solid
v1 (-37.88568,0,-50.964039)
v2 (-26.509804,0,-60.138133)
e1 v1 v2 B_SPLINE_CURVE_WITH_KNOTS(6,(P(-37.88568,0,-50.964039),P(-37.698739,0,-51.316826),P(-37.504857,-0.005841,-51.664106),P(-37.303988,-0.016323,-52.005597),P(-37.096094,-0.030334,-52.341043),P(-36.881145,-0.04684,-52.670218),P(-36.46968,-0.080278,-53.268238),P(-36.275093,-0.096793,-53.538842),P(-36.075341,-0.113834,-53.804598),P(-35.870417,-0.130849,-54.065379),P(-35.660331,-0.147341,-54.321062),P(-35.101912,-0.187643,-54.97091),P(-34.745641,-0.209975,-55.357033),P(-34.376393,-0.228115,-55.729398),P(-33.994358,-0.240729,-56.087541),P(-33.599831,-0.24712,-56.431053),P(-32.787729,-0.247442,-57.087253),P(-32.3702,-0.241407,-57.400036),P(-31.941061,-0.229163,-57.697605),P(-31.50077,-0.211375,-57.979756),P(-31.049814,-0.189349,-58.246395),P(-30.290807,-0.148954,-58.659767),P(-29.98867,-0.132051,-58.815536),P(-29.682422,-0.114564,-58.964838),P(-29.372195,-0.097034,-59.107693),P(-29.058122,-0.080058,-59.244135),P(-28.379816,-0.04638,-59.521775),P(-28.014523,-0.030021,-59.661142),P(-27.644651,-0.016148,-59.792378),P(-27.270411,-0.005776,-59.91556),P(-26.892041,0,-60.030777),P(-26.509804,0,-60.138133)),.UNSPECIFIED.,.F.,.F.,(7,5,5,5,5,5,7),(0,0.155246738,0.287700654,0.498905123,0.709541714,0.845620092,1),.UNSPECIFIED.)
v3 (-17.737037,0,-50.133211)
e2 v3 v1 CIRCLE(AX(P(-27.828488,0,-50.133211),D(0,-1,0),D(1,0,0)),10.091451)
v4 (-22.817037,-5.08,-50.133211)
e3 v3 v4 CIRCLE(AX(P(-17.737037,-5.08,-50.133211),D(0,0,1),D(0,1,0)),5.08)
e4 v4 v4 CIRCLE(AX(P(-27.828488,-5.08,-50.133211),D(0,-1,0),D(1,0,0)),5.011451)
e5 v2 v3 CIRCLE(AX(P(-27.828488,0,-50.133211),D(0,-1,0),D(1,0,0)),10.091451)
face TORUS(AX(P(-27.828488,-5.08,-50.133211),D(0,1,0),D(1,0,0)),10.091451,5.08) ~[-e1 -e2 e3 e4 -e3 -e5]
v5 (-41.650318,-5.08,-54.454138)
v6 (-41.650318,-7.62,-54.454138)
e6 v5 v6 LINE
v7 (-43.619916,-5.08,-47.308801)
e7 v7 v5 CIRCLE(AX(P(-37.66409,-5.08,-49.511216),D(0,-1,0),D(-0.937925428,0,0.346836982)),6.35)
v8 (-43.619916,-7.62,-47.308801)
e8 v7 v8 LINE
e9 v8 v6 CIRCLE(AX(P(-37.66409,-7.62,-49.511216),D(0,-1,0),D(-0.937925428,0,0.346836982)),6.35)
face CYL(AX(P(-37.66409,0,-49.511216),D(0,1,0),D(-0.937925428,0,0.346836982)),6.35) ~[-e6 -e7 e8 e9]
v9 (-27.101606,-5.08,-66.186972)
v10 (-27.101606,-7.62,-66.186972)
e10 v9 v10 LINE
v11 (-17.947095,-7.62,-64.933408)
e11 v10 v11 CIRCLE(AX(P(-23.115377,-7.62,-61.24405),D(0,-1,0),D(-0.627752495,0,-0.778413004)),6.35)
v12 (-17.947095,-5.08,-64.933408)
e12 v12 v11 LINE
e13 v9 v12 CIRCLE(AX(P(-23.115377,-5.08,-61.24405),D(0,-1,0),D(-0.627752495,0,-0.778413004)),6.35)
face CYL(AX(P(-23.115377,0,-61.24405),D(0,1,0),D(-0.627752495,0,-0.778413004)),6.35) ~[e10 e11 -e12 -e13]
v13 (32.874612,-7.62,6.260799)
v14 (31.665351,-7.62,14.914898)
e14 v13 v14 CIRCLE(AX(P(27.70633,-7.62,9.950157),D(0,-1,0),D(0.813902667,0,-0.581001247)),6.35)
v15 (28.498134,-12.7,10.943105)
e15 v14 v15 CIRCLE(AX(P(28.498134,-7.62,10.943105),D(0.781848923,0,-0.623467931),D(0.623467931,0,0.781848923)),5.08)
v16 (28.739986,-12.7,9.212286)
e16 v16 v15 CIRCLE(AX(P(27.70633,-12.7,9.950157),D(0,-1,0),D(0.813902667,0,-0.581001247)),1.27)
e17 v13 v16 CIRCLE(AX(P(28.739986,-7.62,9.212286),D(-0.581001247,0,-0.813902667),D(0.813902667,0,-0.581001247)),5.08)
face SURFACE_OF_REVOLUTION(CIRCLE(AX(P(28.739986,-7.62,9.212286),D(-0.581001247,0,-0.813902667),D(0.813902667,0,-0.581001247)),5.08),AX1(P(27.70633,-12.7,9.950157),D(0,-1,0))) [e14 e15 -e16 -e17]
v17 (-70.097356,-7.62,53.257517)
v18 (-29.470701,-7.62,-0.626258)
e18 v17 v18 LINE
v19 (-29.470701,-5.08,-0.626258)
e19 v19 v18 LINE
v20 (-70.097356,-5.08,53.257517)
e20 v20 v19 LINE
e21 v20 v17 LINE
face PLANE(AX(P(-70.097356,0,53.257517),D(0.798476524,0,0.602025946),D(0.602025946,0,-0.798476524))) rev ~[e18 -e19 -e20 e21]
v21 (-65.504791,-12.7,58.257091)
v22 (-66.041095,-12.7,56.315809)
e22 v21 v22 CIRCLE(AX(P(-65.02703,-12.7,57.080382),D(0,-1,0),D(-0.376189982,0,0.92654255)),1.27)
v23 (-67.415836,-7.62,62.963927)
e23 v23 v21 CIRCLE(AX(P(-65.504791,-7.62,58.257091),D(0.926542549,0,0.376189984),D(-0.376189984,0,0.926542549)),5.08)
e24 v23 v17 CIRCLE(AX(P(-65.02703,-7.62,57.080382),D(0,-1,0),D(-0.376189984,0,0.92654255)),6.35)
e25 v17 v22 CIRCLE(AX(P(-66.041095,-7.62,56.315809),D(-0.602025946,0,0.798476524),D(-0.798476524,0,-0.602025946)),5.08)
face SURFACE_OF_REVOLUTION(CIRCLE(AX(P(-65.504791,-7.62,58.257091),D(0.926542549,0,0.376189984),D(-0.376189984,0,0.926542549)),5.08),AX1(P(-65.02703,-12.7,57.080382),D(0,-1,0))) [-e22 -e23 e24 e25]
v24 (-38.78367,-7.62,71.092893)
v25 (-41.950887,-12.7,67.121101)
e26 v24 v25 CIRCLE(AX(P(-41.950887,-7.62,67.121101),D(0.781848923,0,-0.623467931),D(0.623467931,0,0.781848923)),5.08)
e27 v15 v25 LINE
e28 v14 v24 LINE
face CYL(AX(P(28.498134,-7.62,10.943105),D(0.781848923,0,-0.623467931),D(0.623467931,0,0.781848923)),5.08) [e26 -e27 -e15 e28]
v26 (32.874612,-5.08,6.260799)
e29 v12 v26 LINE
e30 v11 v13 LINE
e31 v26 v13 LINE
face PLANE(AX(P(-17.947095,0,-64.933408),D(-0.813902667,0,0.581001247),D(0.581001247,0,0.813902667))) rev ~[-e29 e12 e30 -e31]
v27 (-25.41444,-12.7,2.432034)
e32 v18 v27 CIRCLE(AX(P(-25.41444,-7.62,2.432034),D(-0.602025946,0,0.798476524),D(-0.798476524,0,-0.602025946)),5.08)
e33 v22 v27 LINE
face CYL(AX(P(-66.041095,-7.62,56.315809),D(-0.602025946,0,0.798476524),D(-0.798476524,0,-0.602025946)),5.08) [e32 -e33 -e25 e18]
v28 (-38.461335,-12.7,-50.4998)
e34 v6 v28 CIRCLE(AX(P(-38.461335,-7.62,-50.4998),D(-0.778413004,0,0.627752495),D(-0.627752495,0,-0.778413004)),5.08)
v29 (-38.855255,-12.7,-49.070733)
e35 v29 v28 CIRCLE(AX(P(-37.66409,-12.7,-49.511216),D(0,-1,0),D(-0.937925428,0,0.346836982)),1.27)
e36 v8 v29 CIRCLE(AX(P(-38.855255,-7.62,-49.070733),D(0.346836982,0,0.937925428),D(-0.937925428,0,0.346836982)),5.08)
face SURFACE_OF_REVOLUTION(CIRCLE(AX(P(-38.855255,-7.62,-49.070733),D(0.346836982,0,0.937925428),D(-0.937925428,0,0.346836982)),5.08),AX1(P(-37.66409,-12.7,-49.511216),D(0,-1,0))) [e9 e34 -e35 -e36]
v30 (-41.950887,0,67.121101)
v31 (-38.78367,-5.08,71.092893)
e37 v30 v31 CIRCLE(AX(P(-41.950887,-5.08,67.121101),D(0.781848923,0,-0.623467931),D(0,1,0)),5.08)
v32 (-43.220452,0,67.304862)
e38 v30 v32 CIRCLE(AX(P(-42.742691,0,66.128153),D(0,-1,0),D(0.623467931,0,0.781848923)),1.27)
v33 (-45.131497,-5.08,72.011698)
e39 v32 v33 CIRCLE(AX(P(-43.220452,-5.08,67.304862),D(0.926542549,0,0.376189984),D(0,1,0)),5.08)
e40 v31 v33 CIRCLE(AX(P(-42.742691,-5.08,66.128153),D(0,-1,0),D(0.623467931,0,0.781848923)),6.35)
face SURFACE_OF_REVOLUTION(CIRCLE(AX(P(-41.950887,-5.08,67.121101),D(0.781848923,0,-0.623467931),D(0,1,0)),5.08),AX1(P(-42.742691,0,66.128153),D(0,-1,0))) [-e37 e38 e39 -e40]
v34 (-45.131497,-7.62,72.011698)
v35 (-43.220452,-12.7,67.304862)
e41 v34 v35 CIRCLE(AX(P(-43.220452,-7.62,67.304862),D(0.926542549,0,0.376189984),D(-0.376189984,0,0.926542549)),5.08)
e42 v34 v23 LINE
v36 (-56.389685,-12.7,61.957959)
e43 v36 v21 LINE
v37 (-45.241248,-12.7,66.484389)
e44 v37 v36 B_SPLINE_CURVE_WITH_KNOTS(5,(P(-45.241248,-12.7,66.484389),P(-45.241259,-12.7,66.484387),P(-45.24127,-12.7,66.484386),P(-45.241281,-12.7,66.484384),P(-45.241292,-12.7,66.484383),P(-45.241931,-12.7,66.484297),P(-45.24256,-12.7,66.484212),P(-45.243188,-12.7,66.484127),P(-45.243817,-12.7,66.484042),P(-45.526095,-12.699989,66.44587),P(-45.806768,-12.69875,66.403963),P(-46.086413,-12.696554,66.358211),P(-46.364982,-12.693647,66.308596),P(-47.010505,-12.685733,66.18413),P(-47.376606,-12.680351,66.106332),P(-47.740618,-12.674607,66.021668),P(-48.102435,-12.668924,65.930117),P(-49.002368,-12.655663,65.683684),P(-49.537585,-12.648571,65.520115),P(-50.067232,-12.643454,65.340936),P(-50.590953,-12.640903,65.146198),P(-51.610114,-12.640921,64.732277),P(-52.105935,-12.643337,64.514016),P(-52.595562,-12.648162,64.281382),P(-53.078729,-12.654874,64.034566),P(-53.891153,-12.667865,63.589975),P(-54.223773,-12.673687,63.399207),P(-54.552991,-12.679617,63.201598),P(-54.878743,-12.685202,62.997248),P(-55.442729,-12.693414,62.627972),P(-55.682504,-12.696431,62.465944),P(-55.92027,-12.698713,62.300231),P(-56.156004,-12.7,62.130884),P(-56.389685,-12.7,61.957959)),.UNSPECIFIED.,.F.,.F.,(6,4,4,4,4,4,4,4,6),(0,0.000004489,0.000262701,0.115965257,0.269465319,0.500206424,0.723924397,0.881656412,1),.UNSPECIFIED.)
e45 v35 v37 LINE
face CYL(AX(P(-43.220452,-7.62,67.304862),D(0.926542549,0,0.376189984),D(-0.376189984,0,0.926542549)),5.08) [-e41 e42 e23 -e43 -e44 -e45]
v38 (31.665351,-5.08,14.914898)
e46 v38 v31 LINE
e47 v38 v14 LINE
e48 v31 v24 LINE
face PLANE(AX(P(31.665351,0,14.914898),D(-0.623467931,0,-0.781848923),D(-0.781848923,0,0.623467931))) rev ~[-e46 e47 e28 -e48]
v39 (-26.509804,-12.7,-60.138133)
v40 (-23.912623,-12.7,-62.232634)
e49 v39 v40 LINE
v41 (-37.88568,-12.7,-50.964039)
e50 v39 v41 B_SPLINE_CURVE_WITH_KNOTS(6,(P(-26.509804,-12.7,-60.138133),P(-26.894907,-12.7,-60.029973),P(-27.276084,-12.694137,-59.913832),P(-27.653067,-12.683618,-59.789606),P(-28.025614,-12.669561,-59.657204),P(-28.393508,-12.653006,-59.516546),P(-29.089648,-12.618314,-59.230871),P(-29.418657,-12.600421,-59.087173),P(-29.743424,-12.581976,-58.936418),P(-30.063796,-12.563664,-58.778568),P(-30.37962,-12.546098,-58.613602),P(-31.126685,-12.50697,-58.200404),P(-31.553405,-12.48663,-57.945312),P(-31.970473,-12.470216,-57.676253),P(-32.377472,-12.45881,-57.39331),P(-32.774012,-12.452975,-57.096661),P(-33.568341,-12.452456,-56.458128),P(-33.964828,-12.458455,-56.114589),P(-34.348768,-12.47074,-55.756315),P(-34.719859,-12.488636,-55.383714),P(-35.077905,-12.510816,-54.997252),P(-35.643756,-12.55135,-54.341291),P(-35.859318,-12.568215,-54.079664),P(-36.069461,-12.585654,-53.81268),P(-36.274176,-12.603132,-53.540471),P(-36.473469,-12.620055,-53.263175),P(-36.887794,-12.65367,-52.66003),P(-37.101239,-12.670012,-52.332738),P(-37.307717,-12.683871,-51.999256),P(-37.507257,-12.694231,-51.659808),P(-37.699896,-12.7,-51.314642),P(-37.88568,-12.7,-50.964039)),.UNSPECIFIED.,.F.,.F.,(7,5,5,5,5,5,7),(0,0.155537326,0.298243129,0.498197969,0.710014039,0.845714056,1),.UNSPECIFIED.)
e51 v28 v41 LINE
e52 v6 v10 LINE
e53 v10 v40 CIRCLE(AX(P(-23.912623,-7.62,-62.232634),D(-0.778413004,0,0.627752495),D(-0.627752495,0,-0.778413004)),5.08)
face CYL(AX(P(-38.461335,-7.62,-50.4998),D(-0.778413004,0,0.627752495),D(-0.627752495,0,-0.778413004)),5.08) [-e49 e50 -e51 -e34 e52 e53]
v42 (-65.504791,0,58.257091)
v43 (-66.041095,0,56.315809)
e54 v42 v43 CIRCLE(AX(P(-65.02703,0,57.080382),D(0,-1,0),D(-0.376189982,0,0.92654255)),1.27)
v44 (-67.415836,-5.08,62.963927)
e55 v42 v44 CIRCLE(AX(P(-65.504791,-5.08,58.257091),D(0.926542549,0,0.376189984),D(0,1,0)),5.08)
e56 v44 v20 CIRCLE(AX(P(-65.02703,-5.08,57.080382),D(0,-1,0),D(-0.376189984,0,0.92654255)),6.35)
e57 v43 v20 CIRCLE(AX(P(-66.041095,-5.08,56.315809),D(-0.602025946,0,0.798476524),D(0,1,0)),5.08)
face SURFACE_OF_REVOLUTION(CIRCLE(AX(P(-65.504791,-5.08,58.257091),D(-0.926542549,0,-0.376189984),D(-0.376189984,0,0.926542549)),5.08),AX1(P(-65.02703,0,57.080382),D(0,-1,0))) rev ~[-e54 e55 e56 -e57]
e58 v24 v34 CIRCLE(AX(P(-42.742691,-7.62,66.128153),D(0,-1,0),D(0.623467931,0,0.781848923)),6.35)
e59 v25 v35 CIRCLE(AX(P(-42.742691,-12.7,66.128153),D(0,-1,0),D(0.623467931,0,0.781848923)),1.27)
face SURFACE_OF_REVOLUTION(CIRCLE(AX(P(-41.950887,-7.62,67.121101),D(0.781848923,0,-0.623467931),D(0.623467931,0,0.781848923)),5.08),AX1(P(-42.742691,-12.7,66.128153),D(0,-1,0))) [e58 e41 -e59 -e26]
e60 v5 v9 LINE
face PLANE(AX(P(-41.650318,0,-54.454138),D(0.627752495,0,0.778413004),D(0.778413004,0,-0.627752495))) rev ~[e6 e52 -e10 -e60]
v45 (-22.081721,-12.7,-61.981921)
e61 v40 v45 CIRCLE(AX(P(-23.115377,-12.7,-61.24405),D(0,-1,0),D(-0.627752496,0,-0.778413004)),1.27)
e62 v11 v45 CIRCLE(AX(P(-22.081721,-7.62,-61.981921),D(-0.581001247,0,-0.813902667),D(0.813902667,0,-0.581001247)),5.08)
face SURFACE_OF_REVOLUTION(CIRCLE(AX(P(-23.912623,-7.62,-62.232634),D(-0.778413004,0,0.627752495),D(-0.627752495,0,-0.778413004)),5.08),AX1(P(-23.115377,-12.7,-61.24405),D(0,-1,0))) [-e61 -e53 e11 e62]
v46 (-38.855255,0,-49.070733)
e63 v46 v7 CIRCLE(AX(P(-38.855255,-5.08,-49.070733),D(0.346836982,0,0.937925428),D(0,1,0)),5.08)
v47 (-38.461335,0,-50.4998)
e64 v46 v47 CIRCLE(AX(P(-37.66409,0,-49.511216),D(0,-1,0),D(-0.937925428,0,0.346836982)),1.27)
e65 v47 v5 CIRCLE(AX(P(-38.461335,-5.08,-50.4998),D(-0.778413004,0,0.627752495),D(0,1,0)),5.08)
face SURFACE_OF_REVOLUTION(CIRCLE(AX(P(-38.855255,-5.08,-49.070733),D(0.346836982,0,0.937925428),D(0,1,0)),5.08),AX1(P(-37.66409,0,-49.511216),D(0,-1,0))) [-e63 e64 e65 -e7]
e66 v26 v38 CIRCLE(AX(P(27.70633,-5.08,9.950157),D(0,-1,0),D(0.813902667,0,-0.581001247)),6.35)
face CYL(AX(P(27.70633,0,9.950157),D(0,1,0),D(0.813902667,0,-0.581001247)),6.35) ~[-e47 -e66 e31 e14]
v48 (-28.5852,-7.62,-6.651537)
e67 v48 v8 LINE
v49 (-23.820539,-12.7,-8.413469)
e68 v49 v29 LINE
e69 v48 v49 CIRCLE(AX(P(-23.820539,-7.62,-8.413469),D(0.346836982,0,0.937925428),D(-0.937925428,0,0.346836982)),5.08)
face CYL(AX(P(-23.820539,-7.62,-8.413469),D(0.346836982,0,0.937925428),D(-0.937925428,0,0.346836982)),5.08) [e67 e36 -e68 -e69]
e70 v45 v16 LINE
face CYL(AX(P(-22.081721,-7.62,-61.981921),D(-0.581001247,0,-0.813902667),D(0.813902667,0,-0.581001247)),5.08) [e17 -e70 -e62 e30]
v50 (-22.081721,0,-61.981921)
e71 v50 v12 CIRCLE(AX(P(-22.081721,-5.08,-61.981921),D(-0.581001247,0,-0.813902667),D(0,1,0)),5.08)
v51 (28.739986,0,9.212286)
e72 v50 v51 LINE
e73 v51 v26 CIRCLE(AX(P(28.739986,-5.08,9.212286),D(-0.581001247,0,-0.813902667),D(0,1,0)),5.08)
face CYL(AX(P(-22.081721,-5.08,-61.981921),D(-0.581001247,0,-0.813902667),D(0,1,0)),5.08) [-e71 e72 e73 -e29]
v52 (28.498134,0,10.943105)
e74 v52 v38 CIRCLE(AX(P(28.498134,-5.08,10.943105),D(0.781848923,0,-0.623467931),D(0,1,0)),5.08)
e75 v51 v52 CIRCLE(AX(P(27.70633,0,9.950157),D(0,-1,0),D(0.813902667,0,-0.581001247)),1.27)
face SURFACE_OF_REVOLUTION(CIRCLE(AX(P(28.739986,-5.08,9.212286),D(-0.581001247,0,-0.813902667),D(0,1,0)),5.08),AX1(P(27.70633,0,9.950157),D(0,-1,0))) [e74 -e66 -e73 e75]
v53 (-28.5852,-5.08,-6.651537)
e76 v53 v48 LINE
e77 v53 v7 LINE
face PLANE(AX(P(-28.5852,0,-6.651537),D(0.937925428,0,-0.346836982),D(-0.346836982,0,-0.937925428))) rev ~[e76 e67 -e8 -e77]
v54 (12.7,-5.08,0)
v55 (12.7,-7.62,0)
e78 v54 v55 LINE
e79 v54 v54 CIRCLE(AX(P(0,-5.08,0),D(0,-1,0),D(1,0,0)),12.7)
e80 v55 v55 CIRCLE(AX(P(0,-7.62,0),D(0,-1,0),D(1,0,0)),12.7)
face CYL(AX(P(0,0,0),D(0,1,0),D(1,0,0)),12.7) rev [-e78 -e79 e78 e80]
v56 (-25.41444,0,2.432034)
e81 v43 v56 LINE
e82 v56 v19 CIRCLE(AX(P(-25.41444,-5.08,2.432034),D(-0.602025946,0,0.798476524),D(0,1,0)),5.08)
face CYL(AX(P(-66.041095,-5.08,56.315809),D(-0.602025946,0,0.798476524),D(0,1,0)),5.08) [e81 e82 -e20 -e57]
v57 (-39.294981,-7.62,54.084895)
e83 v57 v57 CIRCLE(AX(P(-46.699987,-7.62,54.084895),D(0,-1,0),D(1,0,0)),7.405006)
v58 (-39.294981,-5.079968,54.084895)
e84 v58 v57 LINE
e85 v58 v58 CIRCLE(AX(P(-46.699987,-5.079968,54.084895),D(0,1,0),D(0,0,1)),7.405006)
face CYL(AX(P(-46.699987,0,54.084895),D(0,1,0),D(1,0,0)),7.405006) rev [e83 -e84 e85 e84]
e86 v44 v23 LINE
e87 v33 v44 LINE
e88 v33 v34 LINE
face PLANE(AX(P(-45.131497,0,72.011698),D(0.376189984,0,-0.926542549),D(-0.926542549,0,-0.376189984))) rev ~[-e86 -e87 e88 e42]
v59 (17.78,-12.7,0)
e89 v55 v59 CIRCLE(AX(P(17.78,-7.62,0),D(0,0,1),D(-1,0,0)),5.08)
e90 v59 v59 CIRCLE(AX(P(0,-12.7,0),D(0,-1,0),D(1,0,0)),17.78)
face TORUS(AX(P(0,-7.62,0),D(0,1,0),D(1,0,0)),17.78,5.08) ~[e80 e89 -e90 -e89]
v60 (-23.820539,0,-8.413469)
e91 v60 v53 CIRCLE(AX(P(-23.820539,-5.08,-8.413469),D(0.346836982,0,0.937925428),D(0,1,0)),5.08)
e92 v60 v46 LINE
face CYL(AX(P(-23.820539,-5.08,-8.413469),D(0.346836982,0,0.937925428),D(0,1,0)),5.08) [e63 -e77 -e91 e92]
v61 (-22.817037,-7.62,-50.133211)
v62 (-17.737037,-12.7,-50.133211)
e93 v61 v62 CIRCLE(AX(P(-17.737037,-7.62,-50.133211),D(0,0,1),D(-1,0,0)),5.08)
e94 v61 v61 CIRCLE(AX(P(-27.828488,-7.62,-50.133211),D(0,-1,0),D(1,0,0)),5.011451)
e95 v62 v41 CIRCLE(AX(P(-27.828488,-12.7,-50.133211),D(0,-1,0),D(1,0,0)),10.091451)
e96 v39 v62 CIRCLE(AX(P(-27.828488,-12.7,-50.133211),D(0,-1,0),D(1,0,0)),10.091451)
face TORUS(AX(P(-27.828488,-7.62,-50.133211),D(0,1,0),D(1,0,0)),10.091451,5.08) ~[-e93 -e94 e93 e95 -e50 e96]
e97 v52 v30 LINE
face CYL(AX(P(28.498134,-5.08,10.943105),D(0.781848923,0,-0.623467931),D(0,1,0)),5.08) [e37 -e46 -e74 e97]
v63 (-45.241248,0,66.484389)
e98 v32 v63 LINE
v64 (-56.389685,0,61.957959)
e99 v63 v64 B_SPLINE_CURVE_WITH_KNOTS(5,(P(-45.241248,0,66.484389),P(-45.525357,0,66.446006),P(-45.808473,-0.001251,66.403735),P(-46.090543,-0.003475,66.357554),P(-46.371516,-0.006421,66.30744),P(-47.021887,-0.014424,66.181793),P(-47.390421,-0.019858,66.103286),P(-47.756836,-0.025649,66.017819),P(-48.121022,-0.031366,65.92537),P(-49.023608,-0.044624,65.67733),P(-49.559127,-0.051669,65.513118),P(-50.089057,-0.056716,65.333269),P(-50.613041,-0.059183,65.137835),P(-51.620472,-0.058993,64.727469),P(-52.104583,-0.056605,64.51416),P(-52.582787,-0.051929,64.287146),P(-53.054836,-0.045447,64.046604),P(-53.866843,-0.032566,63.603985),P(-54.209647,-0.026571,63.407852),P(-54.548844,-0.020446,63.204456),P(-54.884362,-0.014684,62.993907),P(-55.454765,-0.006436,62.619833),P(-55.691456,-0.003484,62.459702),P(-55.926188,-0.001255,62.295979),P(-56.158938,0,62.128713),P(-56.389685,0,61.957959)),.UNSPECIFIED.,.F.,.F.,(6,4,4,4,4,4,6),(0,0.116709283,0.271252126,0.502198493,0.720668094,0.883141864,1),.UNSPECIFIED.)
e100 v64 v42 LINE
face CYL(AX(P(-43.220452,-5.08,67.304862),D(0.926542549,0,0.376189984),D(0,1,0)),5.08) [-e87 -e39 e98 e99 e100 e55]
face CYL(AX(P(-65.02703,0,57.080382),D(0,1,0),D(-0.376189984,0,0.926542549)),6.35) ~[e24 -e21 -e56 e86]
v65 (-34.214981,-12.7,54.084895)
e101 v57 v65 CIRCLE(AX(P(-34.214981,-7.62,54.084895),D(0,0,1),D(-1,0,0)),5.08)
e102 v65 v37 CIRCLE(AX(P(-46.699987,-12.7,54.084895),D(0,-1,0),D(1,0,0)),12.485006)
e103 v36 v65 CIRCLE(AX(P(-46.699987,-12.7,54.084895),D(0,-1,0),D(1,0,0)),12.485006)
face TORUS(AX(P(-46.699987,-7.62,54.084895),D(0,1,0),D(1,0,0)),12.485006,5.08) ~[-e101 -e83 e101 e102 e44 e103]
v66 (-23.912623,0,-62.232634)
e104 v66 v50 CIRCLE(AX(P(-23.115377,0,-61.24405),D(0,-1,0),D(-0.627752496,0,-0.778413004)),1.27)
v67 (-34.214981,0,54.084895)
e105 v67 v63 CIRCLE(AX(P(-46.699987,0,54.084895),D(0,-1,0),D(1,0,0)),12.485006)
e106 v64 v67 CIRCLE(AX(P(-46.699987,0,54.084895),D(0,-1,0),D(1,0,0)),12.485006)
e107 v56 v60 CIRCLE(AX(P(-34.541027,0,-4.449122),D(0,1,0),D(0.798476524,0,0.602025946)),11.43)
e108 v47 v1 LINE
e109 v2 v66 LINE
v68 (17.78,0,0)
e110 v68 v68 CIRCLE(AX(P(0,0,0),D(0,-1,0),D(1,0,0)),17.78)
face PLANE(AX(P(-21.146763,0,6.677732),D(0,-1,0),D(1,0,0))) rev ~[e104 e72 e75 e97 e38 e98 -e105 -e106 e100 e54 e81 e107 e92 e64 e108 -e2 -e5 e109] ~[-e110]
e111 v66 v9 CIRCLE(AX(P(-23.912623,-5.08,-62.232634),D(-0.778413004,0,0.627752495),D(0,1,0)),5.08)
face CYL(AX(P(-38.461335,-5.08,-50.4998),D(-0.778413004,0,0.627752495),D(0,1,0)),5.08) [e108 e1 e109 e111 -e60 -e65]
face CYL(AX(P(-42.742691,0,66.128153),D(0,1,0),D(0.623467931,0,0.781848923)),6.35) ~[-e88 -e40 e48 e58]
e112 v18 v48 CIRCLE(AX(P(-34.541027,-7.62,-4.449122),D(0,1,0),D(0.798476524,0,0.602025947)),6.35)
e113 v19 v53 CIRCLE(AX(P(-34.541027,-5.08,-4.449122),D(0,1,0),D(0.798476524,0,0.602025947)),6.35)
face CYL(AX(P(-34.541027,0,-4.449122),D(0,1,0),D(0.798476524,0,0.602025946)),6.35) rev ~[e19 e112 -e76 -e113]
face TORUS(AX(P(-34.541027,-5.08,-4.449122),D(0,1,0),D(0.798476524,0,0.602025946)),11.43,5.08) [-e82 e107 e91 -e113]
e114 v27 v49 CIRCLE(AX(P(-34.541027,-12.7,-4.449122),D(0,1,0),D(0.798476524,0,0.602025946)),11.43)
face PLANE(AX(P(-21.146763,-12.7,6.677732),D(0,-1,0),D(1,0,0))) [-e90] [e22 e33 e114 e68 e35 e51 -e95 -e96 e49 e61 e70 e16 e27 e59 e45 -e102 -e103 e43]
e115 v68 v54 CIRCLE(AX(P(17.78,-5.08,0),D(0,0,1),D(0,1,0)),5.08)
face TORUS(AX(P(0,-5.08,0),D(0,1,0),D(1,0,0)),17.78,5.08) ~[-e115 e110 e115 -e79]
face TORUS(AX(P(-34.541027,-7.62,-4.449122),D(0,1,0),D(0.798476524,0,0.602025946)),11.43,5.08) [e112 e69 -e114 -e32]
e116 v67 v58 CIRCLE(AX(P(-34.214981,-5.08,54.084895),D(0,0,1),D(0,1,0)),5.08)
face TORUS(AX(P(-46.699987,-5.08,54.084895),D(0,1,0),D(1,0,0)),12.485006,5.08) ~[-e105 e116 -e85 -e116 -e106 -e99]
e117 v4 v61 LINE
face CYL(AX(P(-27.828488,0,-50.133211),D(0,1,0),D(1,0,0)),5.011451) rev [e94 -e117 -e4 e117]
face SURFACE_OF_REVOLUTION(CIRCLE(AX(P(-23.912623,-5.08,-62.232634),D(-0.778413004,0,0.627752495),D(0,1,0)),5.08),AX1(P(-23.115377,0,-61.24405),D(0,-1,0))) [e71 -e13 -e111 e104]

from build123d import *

# Parameters (mm, degrees)
F0_R         = 5.0114511668
F0_R_2       = 12.7
F0_R_3       = 7.4050061566
F1_DEPTH     = 12.7
F2_T1_DEPTH  = 67.4832294606
F2_T3_DEPTH  = 43.3480770651
F2_T5_DEPTH  = 18.6902227842
F2_T7_DEPTH  = 87.4726302362
F2_T9_DEPTH  = 90.1056698852
F2_T11_DEPTH = 24.0510688963
F2_T14_ANGLE = 104.9172533531
F2_T16_ANGLE = 57.3091059371
F2_T18_ANGLE = 71.4094727033
F2_T20_ANGLE = 93.3635037829
F2_T22_ANGLE = 86.9511700386
F2_T24_ANGLE = 60.6677060592
F3_T1_DEPTH  = 67.4832294606
F3_T3_DEPTH  = 43.3480770651
F3_T5_DEPTH  = 18.6902227842
F3_T7_DEPTH  = 87.4726302362
F3_T9_DEPTH  = 90.1056698852
F3_T11_DEPTH = 24.0510688963
F3_T14_ANGLE = 104.9172533531
F3_T16_ANGLE = 57.3091059371
F3_T18_ANGLE = 71.4094727033
F3_T20_ANGLE = 93.3635037829
F3_T22_ANGLE = 86.9511700386
F3_T24_ANGLE = 60.6677060592


# Not quite as in the source:
# - a fillet or chamfer that OpenCascade refuses, or shapes differently, is made with other operations: its cross-section is extruded or revolved along the edge and cut away or added


with BuildPart() as f1:
    # F0 (on Front) → F1 (new body)
    with BuildSketch(Plane.XZ):
        with BuildLine():
            Line((-70.0973556896, 53.2575167822), (-29.4707006051, -0.6262577244))
            ThreePointArc((-29.4707006051, -0.6262577244), (-28.258510501, -3.5258173929), (-28.5852000675, -6.6515373175))
            Line((-28.5852000675, -6.6515373175), (-43.6199162753, -47.3088010447))
            ThreePointArc((-43.6199162753, -47.3088010447), (-43.7857787204, -51.1986473183), (-41.6503181511, -54.4541384548))
            Line((-41.6503181511, -54.4541384548), (-27.101605684, -66.1869724377))
            ThreePointArc((-27.101605684, -66.1869724377), (-22.2538851697, -67.5353399701), (-17.947095407, -64.9334077788))
            Line((-17.947095407, -64.9334077788), (32.8746118318, 6.2607992451))
            ThreePointArc((32.8746118318, 6.2607992451), (33.9952305909, 10.8289222441), (31.6653512614, 14.9148978249))
            Line((31.6653512614, 14.9148978249), (-38.7836697055, 71.0928934304))
            ThreePointArc((-38.7836697055, 71.0928934304), (-41.8330514714, 72.4126619619), (-45.1314974688, 72.0116979572))
            Line((-45.1314974688, 72.0116979572), (-67.4158361597, 62.9639267308))
            ThreePointArc((-67.4158361597, 62.9639267308), (-71.1477537613, 58.7713096023), (-70.0973556896, 53.2575167822))
        make_face()
        with Locations((-27.8284879681, -50.1332112049)):
            Circle(F0_R, mode=Mode.SUBTRACT)
        Circle(F0_R_2, mode=Mode.SUBTRACT)
        with Locations((-46.6999868111, 54.0848947769)):
            Circle(F0_R_3, mode=Mode.SUBTRACT)
    extrude(amount=F1_DEPTH)

    # F2: fillet of radius 5.08 on 15 edges, made by hand

    # F2_s2 → F2_t1 (cut)
    with BuildSketch(Plane(origin=(-51.0068312032, 0, 67.6511660912), x_dir=(0, 1, 0), z_dir=(0.6020259464, 0, -0.7984765243))):
        with BuildLine():
            ThreePointArc((-7.62, -23.9086859864), (-11.2121024484, -22.4207884348), (-12.7, -18.8286859864))
            Line((-12.7, -18.8286859864), (-12.7, -23.9086859864))
            Line((-12.7, -23.9086859864), (-7.62, -23.9086859864))
        make_face()
    extrude(amount=F2_T1_DEPTH, mode=Mode.SUBTRACT)

    # F2_s4 → F2_t3 (cut)
    with BuildSketch(Plane(origin=(-5.6024752773, 0, -15.1503567959), x_dir=(0, 1, 0), z_dir=(-0.3468369816, 0, -0.9379254278))):
        with BuildLine():
            ThreePointArc((-7.62, -24.5037868769), (-11.2121024484, -23.0158893253), (-12.7, -19.4237868769))
            Line((-12.7, -19.4237868769), (-12.7, -24.5037868769))
            Line((-12.7, -24.5037868769), (-7.62, -24.5037868769))
        make_face()
    extrude(amount=F2_T3_DEPTH, mode=Mode.SUBTRACT)

    # F2_s6 → F2_t5 (cut)
    with BuildSketch(Plane(origin=(1.3720089605, 0, -1.1064589662), x_dir=(0, 1, 0), z_dir=(0.7784130042, 0, -0.6277524949))):
        with BuildLine():
            ThreePointArc((-7.62, -68.5339006399), (-11.2121024484, -67.0460030883), (-12.7, -63.4539006399))
            Line((-12.7, -63.4539006399), (-12.7, -68.5339006399))
            Line((-12.7, -68.5339006399), (-7.62, -68.5339006399))
        make_face()
    extrude(amount=F2_T5_DEPTH, mode=Mode.SUBTRACT)

    # F2_s8 → F2_t7 (cut)
    with BuildSketch(Plane(origin=(-36.7638756291, 0, -51.5011225467), x_dir=(0, 1, 0), z_dir=(0.5810012469, 0, 0.8139026668))):
        with BuildLine():
            ThreePointArc((-7.62, -23.1192020728), (-11.2121024484, -21.6313045212), (-12.7, -18.0392020728))
            Line((-12.7, -18.0392020728), (-12.7, -23.1192020728))
            Line((-12.7, -23.1192020728), (-7.62, -23.1192020728))
        make_face()
    extrude(amount=F2_T7_DEPTH, mode=Mode.SUBTRACT)

    # F2_s10 → F2_t9 (cut)
    with BuildSketch(Plane(origin=(12.0862587165, 0, -9.6379166061), x_dir=(0, 1, 0), z_dir=(-0.7818489231, 0, 0.6234679313))):
        with BuildLine():
            ThreePointArc((-7.62, -31.4035278491), (-11.2121024484, -29.9156302975), (-12.7, -26.3235278491))
            Line((-12.7, -26.3235278491), (-12.7, -31.4035278491))
            Line((-12.7, -31.4035278491), (-7.62, -31.4035278491))
        make_face()
    extrude(amount=F2_T9_DEPTH, mode=Mode.SUBTRACT)

    # F2_s12 → F2_t11 (cut)
    with BuildSketch(Plane(origin=(-13.6444260696, 0, -5.5398388665), x_dir=(0, 1, 0), z_dir=(-0.9265425494, 0, -0.3761899841))):
        with BuildLine():
            ThreePointArc((-7.62, -83.6999195282), (-11.2121024484, -82.2120219766), (-12.7, -78.6199195282))
            Line((-12.7, -78.6199195282), (-12.7, -83.6999195282))
            Line((-12.7, -83.6999195282), (-7.62, -83.6999195282))
        make_face()
    extrude(amount=F2_T11_DEPTH, mode=Mode.SUBTRACT)

    # F2_s13 → F2_t14 (revolve, cut)
    with BuildSketch(Plane(origin=(-35.9287647604, 0, -14.587610093), x_dir=(0, 1, 0), z_dir=(0.9265425494, 0, 0.3761899841))):
        with BuildLine():
            ThreePointArc((-7.62, 83.6999195282), (-11.2121024484, 82.2120219766), (-12.7, 78.6199195282))
            Line((-12.7, 78.6199195282), (-12.7, 83.6999195282))
            Line((-12.7, 83.6999195282), (-7.62, 83.6999195282))
        make_face()
    revolve(axis=Axis((-65.0270297604, -12.7, 57.0803815421), (0, -1, 0)), revolution_arc=F2_T14_ANGLE, mode=Mode.SUBTRACT)

    # F2_s15 → F2_t16 (revolve, cut)
    with BuildSketch(Plane(origin=(-10.3801761187, 0, 13.7673915846), x_dir=(0, 1, 0), z_dir=(-0.6020259464, 0, 0.7984765243))):
        with BuildLine():
            ThreePointArc((-7.62, 23.9086859864), (-11.2121024484, 22.4207884348), (-12.7, 18.8286859864))
            Line((-12.7, 18.8286859864), (-12.7, 23.9086859864))
            Line((-12.7, 23.9086859864), (-7.62, 23.9086859864))
        make_face()
    revolve(axis=Axis((-34.5410265343, -12.7, -4.4491224843), (0, 1, 0)), revolution_arc=F2_T16_ANGLE, mode=Mode.SUBTRACT)

    # F2_s17 → F2_t18 (revolve, cut)
    with BuildSketch(Plane(origin=(-20.6371914851, 0, -55.8076205231), x_dir=(0, 1, 0), z_dir=(0.3468369816, 0, 0.9379254278))):
        with BuildLine():
            ThreePointArc((-7.62, 24.5037868769), (-11.2121024484, 23.0158893253), (-12.7, 19.4237868769))
            Line((-12.7, 19.4237868769), (-12.7, 24.5037868769))
            Line((-12.7, 24.5037868769), (-7.62, 24.5037868769))
        make_face()
    revolve(axis=Axis((-37.6640898085, -12.7, -49.5112158779), (0, -1, 0)), revolution_arc=F2_T18_ANGLE, mode=Mode.SUBTRACT)

    # F2_s19 → F2_t20 (revolve, cut)
    with BuildSketch(Plane(origin=(15.9207214276, 0, -12.8392929492), x_dir=(0, 1, 0), z_dir=(-0.7784130042, 0, 0.6277524949))):
        with BuildLine():
            ThreePointArc((-7.62, 68.5339006399), (-11.2121024484, 67.0460030883), (-12.7, 63.4539006399))
            Line((-12.7, 63.4539006399), (-12.7, 68.5339006399))
            Line((-12.7, 68.5339006399), (-7.62, 68.5339006399))
        make_face()
    revolve(axis=Axis((-23.1153773414, -12.7, -61.2440498609), (0, -1, 0)), revolution_arc=F2_T20_ANGLE, mode=Mode.SUBTRACT)

    # F2_s21 → F2_t22 (revolve, cut)
    with BuildSketch(Plane(origin=(14.0578316098, 0, 19.6930844773), x_dir=(0, 1, 0), z_dir=(-0.5810012469, 0, -0.8139026668))):
        with BuildLine():
            ThreePointArc((-7.62, 23.1192020728), (-11.2121024484, 21.6313045212), (-12.7, 18.0392020728))
            Line((-12.7, 18.0392020728), (-12.7, 23.1192020728))
            Line((-12.7, 23.1192020728), (-7.62, 23.1192020728))
        make_face()
    revolve(axis=Axis((27.7063298974, -12.7, 9.9501571631), (0, -1, 0)), revolution_arc=F2_T22_ANGLE, mode=Mode.SUBTRACT)

    # F2_s23 → F2_t24 (revolve, cut)
    with BuildSketch(Plane(origin=(-58.3627622504, 0, 46.5400789994), x_dir=(0, 1, 0), z_dir=(0.7818489231, 0, -0.6234679313))):
        with BuildLine():
            ThreePointArc((-7.62, 31.4035278491), (-11.2121024484, 29.9156302975), (-12.7, 26.3235278491))
            Line((-12.7, 26.3235278491), (-12.7, 31.4035278491))
            Line((-12.7, 31.4035278491), (-7.62, 31.4035278491))
        make_face()
    revolve(axis=Axis((-42.7426910696, -12.7, 66.1281527686), (0, -1, 0)), revolution_arc=F2_T24_ANGLE, mode=Mode.SUBTRACT)

    # F2_s25 → F2_t26 (revolve, cut)
    with BuildSketch(Plane.XY.offset(-50.1332112049)):
        with BuildLine():
            ThreePointArc((-22.8170368014, -7.62), (-21.3291392498, -11.2121024484), (-17.7370368014, -12.7))
            Line((-17.7370368014, -12.7), (-22.8170368014, -12.7))
            Line((-22.8170368014, -12.7), (-22.8170368014, -7.62))
        make_face()
    revolve(axis=Axis((-27.8284879681, -12.7, -50.1332112049), (0, -1, 0)), mode=Mode.SUBTRACT)

    # F2_s27 → F2_t28 (revolve, cut)
    with BuildSketch(Plane.XY):
        with BuildLine():
            ThreePointArc((12.7, -7.62), (14.1878975516, -11.2121024484), (17.78, -12.7))
            Line((17.78, -12.7), (12.7, -12.7))
            Line((12.7, -12.7), (12.7, -7.62))
        make_face()
    revolve(axis=Axis((0, -12.7, 0), (0, -1, 0)), mode=Mode.SUBTRACT)

    # F2_s29 → F2_t30 (revolve, cut)
    with BuildSketch(Plane.XY.offset(54.0848947769)):
        with BuildLine():
            ThreePointArc((-39.2949806544, -7.62), (-37.8070831029, -11.2121024484), (-34.2149806544, -12.7))
            Line((-34.2149806544, -12.7), (-39.2949806544, -12.7))
            Line((-39.2949806544, -12.7), (-39.2949806544, -7.62))
        make_face()
    revolve(axis=Axis((-46.6999868111, -12.7, 54.0848947769), (0, -1, 0)), mode=Mode.SUBTRACT)

    # F3: fillet of radius 5.08 on 15 edges, made by hand

    # F3_s2 → F3_t1 (cut)
    with BuildSketch(Plane(origin=(-51.0068312032, 0, 67.6511660912), x_dir=(0, 1, 0), z_dir=(0.6020259464, 0, -0.7984765243))):
        with BuildLine():
            ThreePointArc((0, -18.8286859864), (-1.4878975516, -22.4207884348), (-5.08, -23.9086859864))
            Line((-5.08, -23.9086859864), (0, -23.9086859864))
            Line((0, -23.9086859864), (0, -18.8286859864))
        make_face()
    extrude(amount=F3_T1_DEPTH, mode=Mode.SUBTRACT)

    # F3_s4 → F3_t3 (cut)
    with BuildSketch(Plane(origin=(-5.6024752773, 0, -15.1503567959), x_dir=(0, 1, 0), z_dir=(-0.3468369816, 0, -0.9379254278))):
        with BuildLine():
            ThreePointArc((0, -19.4237868769), (-1.4878975516, -23.0158893253), (-5.08, -24.5037868769))
            Line((-5.08, -24.5037868769), (0, -24.5037868769))
            Line((0, -24.5037868769), (0, -19.4237868769))
        make_face()
    extrude(amount=F3_T3_DEPTH, mode=Mode.SUBTRACT)

    # F3_s6 → F3_t5 (cut)
    with BuildSketch(Plane(origin=(1.3720089605, 0, -1.1064589662), x_dir=(0, 1, 0), z_dir=(0.7784130042, 0, -0.6277524949))):
        with BuildLine():
            ThreePointArc((0, -63.4539006399), (-1.4878975516, -67.0460030883), (-5.08, -68.5339006399))
            Line((-5.08, -68.5339006399), (0, -68.5339006399))
            Line((0, -68.5339006399), (0, -63.4539006399))
        make_face()
    extrude(amount=F3_T5_DEPTH, mode=Mode.SUBTRACT)

    # F3_s8 → F3_t7 (cut)
    with BuildSketch(Plane(origin=(-36.7638756291, 0, -51.5011225467), x_dir=(0, 1, 0), z_dir=(0.5810012469, 0, 0.8139026668))):
        with BuildLine():
            ThreePointArc((0, -18.0392020728), (-1.4878975516, -21.6313045212), (-5.08, -23.1192020728))
            Line((-5.08, -23.1192020728), (0, -23.1192020728))
            Line((0, -23.1192020728), (0, -18.0392020728))
        make_face()
    extrude(amount=F3_T7_DEPTH, mode=Mode.SUBTRACT)

    # F3_s10 → F3_t9 (cut)
    with BuildSketch(Plane(origin=(12.0862587165, 0, -9.6379166061), x_dir=(0, 1, 0), z_dir=(-0.7818489231, 0, 0.6234679313))):
        with BuildLine():
            ThreePointArc((0, -26.3235278491), (-1.4878975516, -29.9156302975), (-5.08, -31.4035278491))
            Line((-5.08, -31.4035278491), (0, -31.4035278491))
            Line((0, -31.4035278491), (0, -26.3235278491))
        make_face()
    extrude(amount=F3_T9_DEPTH, mode=Mode.SUBTRACT)

    # F3_s12 → F3_t11 (cut)
    with BuildSketch(Plane(origin=(-13.6444260696, 0, -5.5398388665), x_dir=(0, 1, 0), z_dir=(-0.9265425494, 0, -0.3761899841))):
        with BuildLine():
            ThreePointArc((0, -78.6199195282), (-1.4878975516, -82.2120219766), (-5.08, -83.6999195282))
            Line((-5.08, -83.6999195282), (0, -83.6999195282))
            Line((0, -83.6999195282), (0, -78.6199195282))
        make_face()
    extrude(amount=F3_T11_DEPTH, mode=Mode.SUBTRACT)

    # F3_s13 → F3_t14 (revolve, cut)
    with BuildSketch(Plane(origin=(-35.9287647604, 0, -14.587610093), x_dir=(0, 1, 0), z_dir=(0.9265425494, 0, 0.3761899841))):
        with BuildLine():
            ThreePointArc((-5.08, 83.6999195282), (-1.4878975516, 82.2120219766), (0, 78.6199195282))
            Line((0, 78.6199195282), (0, 83.6999195282))
            Line((0, 83.6999195282), (-5.08, 83.6999195282))
        make_face()
    revolve(axis=Axis((-65.0270297604, 0, 57.0803815421), (0, -1, 0)), revolution_arc=F3_T14_ANGLE, mode=Mode.SUBTRACT)

    # F3_s15 → F3_t16 (revolve, cut)
    with BuildSketch(Plane(origin=(-10.3801761187, 0, 13.7673915846), x_dir=(0, 1, 0), z_dir=(-0.6020259464, 0, 0.7984765243))):
        with BuildLine():
            ThreePointArc((0, 18.8286859864), (-1.4878975516, 22.4207884348), (-5.08, 23.9086859864))
            Line((-5.08, 23.9086859864), (0, 23.9086859864))
            Line((0, 23.9086859864), (0, 18.8286859864))
        make_face()
    revolve(axis=Axis((-34.5410265343, 0, -4.4491224843), (0, 1, 0)), revolution_arc=F3_T16_ANGLE, mode=Mode.SUBTRACT)

    # F3_s17 → F3_t18 (revolve, cut)
    with BuildSketch(Plane(origin=(-20.6371914851, 0, -55.8076205231), x_dir=(0, 1, 0), z_dir=(0.3468369816, 0, 0.9379254278))):
        with BuildLine():
            ThreePointArc((0, 19.4237868769), (-1.4878975516, 23.0158893253), (-5.08, 24.5037868769))
            Line((-5.08, 24.5037868769), (0, 24.5037868769))
            Line((0, 24.5037868769), (0, 19.4237868769))
        make_face()
    revolve(axis=Axis((-37.6640898085, 0, -49.5112158779), (0, -1, 0)), revolution_arc=F3_T18_ANGLE, mode=Mode.SUBTRACT)

    # F3_s19 → F3_t20 (revolve, cut)
    with BuildSketch(Plane(origin=(15.9207214276, 0, -12.8392929492), x_dir=(0, 1, 0), z_dir=(-0.7784130042, 0, 0.6277524949))):
        with BuildLine():
            ThreePointArc((0, 63.4539006399), (-1.4878975516, 67.0460030883), (-5.08, 68.5339006399))
            Line((-5.08, 68.5339006399), (0, 68.5339006399))
            Line((0, 68.5339006399), (0, 63.4539006399))
        make_face()
    revolve(axis=Axis((-23.1153773414, 0, -61.2440498609), (0, -1, 0)), revolution_arc=F3_T20_ANGLE, mode=Mode.SUBTRACT)

    # F3_s21 → F3_t22 (revolve, cut)
    with BuildSketch(Plane(origin=(14.0578316098, 0, 19.6930844773), x_dir=(0, 1, 0), z_dir=(-0.5810012469, 0, -0.8139026668))):
        with BuildLine():
            ThreePointArc((0, 18.0392020728), (-1.4878975516, 21.6313045212), (-5.08, 23.1192020728))
            Line((-5.08, 23.1192020728), (0, 23.1192020728))
            Line((0, 23.1192020728), (0, 18.0392020728))
        make_face()
    revolve(axis=Axis((27.7063298974, 0, 9.9501571631), (0, -1, 0)), revolution_arc=F3_T22_ANGLE, mode=Mode.SUBTRACT)

    # F3_s23 → F3_t24 (revolve, cut)
    with BuildSketch(Plane(origin=(-58.3627622504, 0, 46.5400789994), x_dir=(0, 1, 0), z_dir=(0.7818489231, 0, -0.6234679313))):
        with BuildLine():
            ThreePointArc((0, 26.3235278491), (-1.4878975516, 29.9156302975), (-5.08, 31.4035278491))
            Line((-5.08, 31.4035278491), (0, 31.4035278491))
            Line((0, 31.4035278491), (0, 26.3235278491))
        make_face()
    revolve(axis=Axis((-42.7426910696, 0, 66.1281527686), (0, -1, 0)), revolution_arc=F3_T24_ANGLE, mode=Mode.SUBTRACT)

    # F3_s25 → F3_t26 (revolve, cut)
    with BuildSketch(Plane.XY.offset(-50.1332112049)):
        with BuildLine():
            ThreePointArc((-17.7370368014, 0), (-21.3291392498, -1.4878975516), (-22.8170368014, -5.08))
            Line((-22.8170368014, -5.08), (-22.8170368014, 0))
            Line((-22.8170368014, 0), (-17.7370368014, 0))
        make_face()
    revolve(axis=Axis((-27.8284879681, 0, -50.1332112049), (0, -1, 0)), mode=Mode.SUBTRACT)

    # F3_s27 → F3_t28 (revolve, cut)
    with BuildSketch(Plane.XY):
        with BuildLine():
            ThreePointArc((17.78, 0), (14.1878975516, -1.4878975516), (12.7, -5.08))
            Line((12.7, -5.08), (12.7, 0))
            Line((12.7, 0), (17.78, 0))
        make_face()
    revolve(axis=Axis((0, 0, 0), (0, -1, 0)), mode=Mode.SUBTRACT)

    # F3_s29 → F3_t30 (revolve, cut)
    with BuildSketch(Plane.XY.offset(54.0848947769)):
        with BuildLine():
            ThreePointArc((-34.2149806544, 0), (-37.8070831029, -1.4878975516), (-39.2949806544, -5.08))
            Line((-39.2949806544, -5.08), (-39.2949806544, 0))
            Line((-39.2949806544, 0), (-34.2149806544, 0))
        make_face()
    revolve(axis=Axis((-46.6999868111, 0, 54.0848947769), (0, -1, 0)), mode=Mode.SUBTRACT)


solid = f1.part
